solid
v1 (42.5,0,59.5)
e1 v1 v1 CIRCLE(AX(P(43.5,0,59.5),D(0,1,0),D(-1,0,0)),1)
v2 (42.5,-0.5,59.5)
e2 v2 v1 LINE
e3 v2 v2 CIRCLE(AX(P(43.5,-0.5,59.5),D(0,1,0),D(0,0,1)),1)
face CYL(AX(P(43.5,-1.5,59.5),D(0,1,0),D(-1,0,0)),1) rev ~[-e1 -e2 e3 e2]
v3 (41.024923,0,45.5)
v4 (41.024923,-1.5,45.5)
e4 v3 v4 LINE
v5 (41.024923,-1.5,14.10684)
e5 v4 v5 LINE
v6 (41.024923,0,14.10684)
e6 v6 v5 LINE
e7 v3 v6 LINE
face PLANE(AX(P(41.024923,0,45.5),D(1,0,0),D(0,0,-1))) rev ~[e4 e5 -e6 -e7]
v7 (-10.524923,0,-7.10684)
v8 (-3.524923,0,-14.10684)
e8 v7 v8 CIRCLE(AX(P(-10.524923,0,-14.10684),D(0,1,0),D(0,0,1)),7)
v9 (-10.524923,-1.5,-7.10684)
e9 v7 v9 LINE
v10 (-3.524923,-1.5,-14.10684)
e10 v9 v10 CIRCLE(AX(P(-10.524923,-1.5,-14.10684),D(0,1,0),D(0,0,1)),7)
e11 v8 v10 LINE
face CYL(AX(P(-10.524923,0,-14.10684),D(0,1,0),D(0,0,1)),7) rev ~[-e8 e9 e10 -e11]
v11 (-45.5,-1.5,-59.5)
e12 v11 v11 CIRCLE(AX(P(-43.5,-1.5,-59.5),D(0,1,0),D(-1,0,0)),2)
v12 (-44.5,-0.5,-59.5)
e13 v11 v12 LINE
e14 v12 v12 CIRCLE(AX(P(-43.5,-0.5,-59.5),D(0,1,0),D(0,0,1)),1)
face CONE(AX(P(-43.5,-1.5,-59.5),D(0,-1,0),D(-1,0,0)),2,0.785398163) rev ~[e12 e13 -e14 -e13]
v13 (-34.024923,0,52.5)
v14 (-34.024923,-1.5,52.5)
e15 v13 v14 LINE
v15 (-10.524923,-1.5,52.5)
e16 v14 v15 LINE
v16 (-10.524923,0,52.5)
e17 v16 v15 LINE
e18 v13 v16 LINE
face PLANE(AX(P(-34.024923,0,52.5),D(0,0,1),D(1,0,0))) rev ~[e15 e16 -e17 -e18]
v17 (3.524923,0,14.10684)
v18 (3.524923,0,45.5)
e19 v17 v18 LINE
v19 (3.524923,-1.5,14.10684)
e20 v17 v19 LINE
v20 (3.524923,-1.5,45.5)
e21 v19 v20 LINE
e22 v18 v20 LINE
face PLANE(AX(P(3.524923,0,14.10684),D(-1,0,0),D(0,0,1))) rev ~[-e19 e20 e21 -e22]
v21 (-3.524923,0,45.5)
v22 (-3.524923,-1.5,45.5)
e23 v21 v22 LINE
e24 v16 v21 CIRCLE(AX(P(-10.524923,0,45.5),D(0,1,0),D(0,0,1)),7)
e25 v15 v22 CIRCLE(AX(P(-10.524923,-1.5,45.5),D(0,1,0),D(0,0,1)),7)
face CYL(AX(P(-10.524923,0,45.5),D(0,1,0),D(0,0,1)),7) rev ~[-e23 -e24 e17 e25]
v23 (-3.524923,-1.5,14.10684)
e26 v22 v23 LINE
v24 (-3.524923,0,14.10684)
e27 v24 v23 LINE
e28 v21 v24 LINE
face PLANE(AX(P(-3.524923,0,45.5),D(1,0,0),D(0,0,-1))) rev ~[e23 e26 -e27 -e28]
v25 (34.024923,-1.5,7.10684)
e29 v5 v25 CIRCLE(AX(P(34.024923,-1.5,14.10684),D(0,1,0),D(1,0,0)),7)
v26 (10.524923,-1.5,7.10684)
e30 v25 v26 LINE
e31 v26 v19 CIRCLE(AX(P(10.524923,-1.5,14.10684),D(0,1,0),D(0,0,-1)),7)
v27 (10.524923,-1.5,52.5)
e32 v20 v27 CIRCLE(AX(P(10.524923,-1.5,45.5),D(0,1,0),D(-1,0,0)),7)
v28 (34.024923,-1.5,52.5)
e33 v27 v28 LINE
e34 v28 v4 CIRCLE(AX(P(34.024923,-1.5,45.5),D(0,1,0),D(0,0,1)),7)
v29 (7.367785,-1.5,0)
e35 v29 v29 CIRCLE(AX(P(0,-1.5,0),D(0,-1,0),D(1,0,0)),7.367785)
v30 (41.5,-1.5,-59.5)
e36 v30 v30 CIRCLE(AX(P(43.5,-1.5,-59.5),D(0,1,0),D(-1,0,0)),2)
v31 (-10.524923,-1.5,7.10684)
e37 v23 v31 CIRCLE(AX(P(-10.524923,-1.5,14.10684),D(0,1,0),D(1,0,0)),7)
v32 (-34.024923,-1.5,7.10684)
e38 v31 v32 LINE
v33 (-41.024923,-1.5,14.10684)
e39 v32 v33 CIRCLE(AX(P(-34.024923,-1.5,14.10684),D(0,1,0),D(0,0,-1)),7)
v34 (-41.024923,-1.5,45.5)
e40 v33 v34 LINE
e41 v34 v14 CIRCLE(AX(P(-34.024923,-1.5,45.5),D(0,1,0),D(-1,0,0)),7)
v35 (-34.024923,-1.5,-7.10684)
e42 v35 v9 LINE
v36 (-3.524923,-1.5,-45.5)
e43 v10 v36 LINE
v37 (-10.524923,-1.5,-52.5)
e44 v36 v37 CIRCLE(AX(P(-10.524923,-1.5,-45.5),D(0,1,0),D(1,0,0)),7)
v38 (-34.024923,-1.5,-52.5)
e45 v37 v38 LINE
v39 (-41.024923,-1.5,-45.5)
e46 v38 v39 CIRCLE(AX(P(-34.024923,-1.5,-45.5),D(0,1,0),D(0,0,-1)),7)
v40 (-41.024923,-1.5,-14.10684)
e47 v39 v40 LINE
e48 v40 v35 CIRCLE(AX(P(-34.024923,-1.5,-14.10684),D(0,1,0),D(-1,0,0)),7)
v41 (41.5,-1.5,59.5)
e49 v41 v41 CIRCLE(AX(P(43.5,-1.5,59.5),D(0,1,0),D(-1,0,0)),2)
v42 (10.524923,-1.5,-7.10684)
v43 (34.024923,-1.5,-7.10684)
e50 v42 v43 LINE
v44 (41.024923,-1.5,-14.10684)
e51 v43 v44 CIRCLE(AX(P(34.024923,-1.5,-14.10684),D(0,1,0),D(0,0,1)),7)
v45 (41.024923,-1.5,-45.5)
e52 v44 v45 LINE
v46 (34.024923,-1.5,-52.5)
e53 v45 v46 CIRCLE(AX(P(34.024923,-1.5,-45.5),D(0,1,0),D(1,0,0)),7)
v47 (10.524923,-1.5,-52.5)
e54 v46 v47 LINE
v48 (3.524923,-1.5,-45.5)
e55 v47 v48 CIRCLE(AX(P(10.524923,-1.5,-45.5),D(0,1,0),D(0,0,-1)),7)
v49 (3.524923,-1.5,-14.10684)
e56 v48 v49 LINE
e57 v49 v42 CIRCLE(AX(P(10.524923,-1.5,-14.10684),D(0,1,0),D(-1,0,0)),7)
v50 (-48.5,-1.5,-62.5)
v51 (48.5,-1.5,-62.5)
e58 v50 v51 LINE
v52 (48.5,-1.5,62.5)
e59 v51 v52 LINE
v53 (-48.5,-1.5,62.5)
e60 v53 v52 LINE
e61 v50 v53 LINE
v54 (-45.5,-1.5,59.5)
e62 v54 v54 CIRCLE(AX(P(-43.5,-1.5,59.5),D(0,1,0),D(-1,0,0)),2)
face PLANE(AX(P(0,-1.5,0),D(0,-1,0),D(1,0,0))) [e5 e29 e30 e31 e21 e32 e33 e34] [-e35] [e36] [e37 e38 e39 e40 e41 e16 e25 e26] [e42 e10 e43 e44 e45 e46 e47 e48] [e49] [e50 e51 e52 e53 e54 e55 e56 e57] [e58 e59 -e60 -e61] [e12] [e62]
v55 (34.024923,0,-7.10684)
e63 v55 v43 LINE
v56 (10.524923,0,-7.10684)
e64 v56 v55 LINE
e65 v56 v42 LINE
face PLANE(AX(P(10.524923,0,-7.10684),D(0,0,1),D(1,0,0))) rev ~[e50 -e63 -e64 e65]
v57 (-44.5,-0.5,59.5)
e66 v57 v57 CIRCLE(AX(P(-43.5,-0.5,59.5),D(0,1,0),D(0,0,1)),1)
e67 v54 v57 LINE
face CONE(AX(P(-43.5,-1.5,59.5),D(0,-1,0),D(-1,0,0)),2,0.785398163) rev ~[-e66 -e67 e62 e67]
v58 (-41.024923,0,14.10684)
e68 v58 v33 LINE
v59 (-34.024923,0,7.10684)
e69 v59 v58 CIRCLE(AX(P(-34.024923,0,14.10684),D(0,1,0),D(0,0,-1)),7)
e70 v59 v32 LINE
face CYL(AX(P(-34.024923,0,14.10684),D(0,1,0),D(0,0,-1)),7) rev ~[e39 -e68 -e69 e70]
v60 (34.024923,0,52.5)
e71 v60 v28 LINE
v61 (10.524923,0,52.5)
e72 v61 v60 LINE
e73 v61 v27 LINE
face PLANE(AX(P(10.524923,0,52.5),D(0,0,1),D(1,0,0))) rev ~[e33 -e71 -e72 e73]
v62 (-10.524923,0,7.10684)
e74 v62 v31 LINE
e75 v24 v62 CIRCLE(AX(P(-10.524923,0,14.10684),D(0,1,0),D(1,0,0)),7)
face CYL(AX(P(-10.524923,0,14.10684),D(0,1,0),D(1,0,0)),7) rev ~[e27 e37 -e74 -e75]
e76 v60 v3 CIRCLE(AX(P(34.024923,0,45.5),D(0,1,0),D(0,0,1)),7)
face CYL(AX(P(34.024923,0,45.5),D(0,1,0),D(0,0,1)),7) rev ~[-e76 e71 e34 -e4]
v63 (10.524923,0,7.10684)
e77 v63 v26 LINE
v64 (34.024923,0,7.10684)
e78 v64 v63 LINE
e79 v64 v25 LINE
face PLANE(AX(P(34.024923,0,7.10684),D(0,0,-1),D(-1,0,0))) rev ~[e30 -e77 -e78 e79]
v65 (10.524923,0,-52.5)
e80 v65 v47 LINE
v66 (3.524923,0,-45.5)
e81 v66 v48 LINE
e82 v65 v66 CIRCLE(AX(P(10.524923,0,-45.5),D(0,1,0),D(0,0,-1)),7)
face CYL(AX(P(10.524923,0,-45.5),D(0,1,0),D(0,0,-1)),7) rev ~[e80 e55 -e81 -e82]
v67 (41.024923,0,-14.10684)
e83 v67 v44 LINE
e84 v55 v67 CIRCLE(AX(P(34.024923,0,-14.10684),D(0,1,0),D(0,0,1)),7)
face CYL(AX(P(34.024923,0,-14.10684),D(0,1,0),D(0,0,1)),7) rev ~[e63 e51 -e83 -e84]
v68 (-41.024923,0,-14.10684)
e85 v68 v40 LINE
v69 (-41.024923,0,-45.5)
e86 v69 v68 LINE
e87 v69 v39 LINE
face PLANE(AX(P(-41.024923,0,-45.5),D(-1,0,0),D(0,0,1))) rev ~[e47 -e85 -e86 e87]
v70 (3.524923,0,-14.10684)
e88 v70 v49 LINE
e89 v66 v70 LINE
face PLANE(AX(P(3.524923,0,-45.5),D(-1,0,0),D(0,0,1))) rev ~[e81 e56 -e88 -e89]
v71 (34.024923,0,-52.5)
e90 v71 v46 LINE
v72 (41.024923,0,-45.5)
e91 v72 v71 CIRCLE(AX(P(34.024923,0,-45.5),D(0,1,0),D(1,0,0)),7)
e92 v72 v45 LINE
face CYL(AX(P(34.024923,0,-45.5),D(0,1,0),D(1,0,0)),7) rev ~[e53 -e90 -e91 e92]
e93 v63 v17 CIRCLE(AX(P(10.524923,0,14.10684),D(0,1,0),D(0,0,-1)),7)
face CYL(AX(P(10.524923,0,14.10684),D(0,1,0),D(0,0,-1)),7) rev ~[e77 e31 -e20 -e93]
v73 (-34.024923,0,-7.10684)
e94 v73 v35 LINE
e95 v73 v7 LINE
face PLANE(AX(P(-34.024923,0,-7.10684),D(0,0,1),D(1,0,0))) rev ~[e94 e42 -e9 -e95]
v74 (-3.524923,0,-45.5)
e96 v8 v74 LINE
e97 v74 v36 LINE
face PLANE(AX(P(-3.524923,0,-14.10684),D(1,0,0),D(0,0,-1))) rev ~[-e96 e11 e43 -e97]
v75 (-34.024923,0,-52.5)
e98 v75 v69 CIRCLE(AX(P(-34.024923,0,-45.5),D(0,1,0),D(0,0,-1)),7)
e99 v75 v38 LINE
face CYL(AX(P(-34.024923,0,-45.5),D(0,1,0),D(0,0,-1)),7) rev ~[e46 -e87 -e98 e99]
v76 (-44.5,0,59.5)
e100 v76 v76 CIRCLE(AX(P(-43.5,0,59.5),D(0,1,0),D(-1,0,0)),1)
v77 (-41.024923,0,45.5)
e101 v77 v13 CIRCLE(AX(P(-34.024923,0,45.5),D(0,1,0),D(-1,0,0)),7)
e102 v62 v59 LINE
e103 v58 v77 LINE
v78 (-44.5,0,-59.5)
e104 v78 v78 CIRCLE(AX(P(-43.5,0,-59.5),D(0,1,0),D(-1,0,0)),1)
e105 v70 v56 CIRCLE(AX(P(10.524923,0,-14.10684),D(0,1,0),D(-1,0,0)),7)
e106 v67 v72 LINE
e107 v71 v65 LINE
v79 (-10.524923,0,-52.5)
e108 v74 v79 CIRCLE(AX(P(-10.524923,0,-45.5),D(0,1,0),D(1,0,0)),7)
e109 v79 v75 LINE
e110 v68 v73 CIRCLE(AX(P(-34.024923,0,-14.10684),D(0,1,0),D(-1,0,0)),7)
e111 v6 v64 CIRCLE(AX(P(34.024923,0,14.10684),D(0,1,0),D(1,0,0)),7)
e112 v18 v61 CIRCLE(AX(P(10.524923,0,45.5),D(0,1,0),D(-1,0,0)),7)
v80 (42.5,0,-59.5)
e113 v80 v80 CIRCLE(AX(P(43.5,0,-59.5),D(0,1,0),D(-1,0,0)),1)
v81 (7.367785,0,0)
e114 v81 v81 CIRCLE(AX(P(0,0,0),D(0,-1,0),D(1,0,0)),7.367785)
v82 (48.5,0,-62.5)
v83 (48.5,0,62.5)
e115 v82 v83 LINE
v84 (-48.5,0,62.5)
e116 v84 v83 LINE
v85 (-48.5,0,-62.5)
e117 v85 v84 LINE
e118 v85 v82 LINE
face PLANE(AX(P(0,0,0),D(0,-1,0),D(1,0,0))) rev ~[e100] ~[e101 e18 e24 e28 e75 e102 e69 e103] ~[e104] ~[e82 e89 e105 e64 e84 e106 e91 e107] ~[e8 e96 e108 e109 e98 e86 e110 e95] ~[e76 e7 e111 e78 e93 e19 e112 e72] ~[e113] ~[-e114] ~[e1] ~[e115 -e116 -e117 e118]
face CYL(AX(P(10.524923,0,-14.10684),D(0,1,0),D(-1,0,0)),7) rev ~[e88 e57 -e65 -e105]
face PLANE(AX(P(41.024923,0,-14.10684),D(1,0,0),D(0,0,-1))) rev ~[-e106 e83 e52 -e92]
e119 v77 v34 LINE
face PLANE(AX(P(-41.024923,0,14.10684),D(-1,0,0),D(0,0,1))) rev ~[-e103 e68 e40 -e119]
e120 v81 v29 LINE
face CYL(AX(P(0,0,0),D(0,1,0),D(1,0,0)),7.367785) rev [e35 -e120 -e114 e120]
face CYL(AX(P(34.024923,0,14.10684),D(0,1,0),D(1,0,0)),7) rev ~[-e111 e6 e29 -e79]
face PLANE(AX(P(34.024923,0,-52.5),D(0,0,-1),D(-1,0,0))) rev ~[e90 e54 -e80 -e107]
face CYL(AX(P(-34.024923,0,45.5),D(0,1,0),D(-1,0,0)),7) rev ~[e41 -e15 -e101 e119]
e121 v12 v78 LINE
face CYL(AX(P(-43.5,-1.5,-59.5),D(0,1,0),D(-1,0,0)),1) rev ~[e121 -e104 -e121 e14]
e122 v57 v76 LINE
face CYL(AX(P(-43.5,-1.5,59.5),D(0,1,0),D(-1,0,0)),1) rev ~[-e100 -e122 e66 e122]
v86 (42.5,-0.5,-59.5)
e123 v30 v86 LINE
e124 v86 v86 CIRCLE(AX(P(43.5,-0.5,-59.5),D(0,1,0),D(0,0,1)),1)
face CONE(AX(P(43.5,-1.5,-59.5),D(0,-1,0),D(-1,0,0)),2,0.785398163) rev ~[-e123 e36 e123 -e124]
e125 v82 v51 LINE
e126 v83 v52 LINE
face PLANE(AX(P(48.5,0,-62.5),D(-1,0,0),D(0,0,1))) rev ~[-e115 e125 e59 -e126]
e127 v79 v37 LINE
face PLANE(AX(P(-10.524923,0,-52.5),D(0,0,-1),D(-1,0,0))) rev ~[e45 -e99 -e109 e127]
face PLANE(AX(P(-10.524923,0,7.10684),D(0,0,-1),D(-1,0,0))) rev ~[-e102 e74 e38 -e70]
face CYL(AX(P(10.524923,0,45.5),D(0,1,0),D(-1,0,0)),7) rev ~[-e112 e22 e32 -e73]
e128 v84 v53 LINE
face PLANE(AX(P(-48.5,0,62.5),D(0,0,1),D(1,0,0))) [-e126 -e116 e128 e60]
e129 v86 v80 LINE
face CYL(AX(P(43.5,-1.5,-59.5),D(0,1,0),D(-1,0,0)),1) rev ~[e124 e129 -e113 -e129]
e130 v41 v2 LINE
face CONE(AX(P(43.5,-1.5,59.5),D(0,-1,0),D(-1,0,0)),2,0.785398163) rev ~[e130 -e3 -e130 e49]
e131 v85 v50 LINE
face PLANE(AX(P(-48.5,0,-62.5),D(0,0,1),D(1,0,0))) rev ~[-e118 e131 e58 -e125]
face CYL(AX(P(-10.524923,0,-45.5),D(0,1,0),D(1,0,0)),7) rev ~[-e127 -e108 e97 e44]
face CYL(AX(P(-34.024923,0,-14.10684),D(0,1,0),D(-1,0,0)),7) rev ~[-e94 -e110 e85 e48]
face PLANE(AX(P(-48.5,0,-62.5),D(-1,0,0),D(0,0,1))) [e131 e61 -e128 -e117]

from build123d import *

# Parameters (mm, degrees)
F0_W           = 97
F0_H           = 125
F0_R           = 7.367785
F1_DEPTH       = 1.5
F3_D           = 2
F3_CSINK_D     = 4
F3_CSINK_ANGLE = 90


# Not quite as in the source:
# - a feature names something its author has since deleted; it is built from what else it names


with BuildPart() as f1:
    # F0 (on Front) → F1 (new body)
    with BuildSketch(Plane.XZ):
        Rectangle(F0_W, F0_H)
        with BuildLine():
            Line((-34.0249225795, -7.10684), (-10.5249225795, -7.10684))
            ThreePointArc((-10.5249225795, -7.10684), (-5.5751751112, -9.1570925317), (-3.5249225795, -14.10684))
            Line((-3.5249225795, -14.10684), (-3.5249225795, -45.5))
            ThreePointArc((-3.5249225795, -45.5), (-5.5751751112, -50.4497474683), (-10.5249225795, -52.5))
            Line((-10.5249225795, -52.5), (-34.0249225795, -52.5))
            ThreePointArc((-34.0249225795, -52.5), (-38.9746700478, -50.4497474683), (-41.0249225795, -45.5))
            Line((-41.0249225795, -45.5), (-41.0249225795, -14.10684))
            ThreePointArc((-41.0249225795, -14.10684), (-38.9746700478, -9.1570925317), (-34.0249225795, -7.10684))
        make_face(mode=Mode.SUBTRACT)
        with BuildLine():
            ThreePointArc((41.0249225795, -45.5), (38.9746700478, -50.4497474683), (34.0249225795, -52.5))
            Line((34.0249225795, -52.5), (10.5249225795, -52.5))
            ThreePointArc((10.5249225795, -52.5), (5.5751751112, -50.4497474683), (3.5249225795, -45.5))
            Line((3.5249225795, -45.5), (3.5249225795, -14.10684))
            ThreePointArc((3.5249225795, -14.10684), (5.5751751112, -9.1570925317), (10.5249225795, -7.10684))
            Line((10.5249225795, -7.10684), (34.0249225795, -7.10684))
            ThreePointArc((34.0249225795, -7.10684), (38.9746700478, -9.1570925317), (41.0249225795, -14.10684))
            Line((41.0249225795, -14.10684), (41.0249225795, -45.5))
        make_face(mode=Mode.SUBTRACT)
        with BuildLine():
            ThreePointArc((-3.5249225795, 14.10684), (-5.5751751112, 9.1570925317), (-10.5249225795, 7.10684))
            Line((-10.5249225795, 7.10684), (-34.0249225795, 7.10684))
            ThreePointArc((-34.0249225795, 7.10684), (-38.9746700478, 9.1570925317), (-41.0249225795, 14.10684))
            Line((-41.0249225795, 14.10684), (-41.0249225795, 45.5))
            ThreePointArc((-41.0249225795, 45.5), (-38.9746700478, 50.4497474683), (-34.0249225795, 52.5))
            Line((-34.0249225795, 52.5), (-10.5249225795, 52.5))
            ThreePointArc((-10.5249225795, 52.5), (-5.5751751112, 50.4497474683), (-3.5249225795, 45.5))
            Line((-3.5249225795, 45.5), (-3.5249225795, 14.10684))
        make_face(mode=Mode.SUBTRACT)
        Circle(F0_R, mode=Mode.SUBTRACT)
        with BuildLine():
            ThreePointArc((10.5249225795, 7.10684), (5.5751751112, 9.1570925317), (3.5249225795, 14.10684))
            Line((3.5249225795, 14.10684), (3.5249225795, 45.5))
            ThreePointArc((3.5249225795, 45.5), (5.5751751112, 50.4497474683), (10.5249225795, 52.5))
            Line((10.5249225795, 52.5), (34.0249225795, 52.5))
            ThreePointArc((34.0249225795, 52.5), (38.9746700478, 50.4497474683), (41.0249225795, 45.5))
            Line((41.0249225795, 45.5), (41.0249225795, 14.10684))
            ThreePointArc((41.0249225795, 14.10684), (38.9746700478, 9.1570925317), (34.0249225795, 7.10684))
            Line((34.0249225795, 7.10684), (10.5249225795, 7.10684))
        make_face(mode=Mode.SUBTRACT)
    extrude(amount=F1_DEPTH)

    # F3 (through all)
    with Locations(Plane.XZ.offset(1.5)):
        with Locations((-43.5, -59.5), (43.5, -59.5), (43.5, 59.5), (-43.5, 59.5)):
            CounterSinkHole(F3_D / 2, F3_CSINK_D / 2, counter_sink_angle=F3_CSINK_ANGLE)


solid = f1.part
